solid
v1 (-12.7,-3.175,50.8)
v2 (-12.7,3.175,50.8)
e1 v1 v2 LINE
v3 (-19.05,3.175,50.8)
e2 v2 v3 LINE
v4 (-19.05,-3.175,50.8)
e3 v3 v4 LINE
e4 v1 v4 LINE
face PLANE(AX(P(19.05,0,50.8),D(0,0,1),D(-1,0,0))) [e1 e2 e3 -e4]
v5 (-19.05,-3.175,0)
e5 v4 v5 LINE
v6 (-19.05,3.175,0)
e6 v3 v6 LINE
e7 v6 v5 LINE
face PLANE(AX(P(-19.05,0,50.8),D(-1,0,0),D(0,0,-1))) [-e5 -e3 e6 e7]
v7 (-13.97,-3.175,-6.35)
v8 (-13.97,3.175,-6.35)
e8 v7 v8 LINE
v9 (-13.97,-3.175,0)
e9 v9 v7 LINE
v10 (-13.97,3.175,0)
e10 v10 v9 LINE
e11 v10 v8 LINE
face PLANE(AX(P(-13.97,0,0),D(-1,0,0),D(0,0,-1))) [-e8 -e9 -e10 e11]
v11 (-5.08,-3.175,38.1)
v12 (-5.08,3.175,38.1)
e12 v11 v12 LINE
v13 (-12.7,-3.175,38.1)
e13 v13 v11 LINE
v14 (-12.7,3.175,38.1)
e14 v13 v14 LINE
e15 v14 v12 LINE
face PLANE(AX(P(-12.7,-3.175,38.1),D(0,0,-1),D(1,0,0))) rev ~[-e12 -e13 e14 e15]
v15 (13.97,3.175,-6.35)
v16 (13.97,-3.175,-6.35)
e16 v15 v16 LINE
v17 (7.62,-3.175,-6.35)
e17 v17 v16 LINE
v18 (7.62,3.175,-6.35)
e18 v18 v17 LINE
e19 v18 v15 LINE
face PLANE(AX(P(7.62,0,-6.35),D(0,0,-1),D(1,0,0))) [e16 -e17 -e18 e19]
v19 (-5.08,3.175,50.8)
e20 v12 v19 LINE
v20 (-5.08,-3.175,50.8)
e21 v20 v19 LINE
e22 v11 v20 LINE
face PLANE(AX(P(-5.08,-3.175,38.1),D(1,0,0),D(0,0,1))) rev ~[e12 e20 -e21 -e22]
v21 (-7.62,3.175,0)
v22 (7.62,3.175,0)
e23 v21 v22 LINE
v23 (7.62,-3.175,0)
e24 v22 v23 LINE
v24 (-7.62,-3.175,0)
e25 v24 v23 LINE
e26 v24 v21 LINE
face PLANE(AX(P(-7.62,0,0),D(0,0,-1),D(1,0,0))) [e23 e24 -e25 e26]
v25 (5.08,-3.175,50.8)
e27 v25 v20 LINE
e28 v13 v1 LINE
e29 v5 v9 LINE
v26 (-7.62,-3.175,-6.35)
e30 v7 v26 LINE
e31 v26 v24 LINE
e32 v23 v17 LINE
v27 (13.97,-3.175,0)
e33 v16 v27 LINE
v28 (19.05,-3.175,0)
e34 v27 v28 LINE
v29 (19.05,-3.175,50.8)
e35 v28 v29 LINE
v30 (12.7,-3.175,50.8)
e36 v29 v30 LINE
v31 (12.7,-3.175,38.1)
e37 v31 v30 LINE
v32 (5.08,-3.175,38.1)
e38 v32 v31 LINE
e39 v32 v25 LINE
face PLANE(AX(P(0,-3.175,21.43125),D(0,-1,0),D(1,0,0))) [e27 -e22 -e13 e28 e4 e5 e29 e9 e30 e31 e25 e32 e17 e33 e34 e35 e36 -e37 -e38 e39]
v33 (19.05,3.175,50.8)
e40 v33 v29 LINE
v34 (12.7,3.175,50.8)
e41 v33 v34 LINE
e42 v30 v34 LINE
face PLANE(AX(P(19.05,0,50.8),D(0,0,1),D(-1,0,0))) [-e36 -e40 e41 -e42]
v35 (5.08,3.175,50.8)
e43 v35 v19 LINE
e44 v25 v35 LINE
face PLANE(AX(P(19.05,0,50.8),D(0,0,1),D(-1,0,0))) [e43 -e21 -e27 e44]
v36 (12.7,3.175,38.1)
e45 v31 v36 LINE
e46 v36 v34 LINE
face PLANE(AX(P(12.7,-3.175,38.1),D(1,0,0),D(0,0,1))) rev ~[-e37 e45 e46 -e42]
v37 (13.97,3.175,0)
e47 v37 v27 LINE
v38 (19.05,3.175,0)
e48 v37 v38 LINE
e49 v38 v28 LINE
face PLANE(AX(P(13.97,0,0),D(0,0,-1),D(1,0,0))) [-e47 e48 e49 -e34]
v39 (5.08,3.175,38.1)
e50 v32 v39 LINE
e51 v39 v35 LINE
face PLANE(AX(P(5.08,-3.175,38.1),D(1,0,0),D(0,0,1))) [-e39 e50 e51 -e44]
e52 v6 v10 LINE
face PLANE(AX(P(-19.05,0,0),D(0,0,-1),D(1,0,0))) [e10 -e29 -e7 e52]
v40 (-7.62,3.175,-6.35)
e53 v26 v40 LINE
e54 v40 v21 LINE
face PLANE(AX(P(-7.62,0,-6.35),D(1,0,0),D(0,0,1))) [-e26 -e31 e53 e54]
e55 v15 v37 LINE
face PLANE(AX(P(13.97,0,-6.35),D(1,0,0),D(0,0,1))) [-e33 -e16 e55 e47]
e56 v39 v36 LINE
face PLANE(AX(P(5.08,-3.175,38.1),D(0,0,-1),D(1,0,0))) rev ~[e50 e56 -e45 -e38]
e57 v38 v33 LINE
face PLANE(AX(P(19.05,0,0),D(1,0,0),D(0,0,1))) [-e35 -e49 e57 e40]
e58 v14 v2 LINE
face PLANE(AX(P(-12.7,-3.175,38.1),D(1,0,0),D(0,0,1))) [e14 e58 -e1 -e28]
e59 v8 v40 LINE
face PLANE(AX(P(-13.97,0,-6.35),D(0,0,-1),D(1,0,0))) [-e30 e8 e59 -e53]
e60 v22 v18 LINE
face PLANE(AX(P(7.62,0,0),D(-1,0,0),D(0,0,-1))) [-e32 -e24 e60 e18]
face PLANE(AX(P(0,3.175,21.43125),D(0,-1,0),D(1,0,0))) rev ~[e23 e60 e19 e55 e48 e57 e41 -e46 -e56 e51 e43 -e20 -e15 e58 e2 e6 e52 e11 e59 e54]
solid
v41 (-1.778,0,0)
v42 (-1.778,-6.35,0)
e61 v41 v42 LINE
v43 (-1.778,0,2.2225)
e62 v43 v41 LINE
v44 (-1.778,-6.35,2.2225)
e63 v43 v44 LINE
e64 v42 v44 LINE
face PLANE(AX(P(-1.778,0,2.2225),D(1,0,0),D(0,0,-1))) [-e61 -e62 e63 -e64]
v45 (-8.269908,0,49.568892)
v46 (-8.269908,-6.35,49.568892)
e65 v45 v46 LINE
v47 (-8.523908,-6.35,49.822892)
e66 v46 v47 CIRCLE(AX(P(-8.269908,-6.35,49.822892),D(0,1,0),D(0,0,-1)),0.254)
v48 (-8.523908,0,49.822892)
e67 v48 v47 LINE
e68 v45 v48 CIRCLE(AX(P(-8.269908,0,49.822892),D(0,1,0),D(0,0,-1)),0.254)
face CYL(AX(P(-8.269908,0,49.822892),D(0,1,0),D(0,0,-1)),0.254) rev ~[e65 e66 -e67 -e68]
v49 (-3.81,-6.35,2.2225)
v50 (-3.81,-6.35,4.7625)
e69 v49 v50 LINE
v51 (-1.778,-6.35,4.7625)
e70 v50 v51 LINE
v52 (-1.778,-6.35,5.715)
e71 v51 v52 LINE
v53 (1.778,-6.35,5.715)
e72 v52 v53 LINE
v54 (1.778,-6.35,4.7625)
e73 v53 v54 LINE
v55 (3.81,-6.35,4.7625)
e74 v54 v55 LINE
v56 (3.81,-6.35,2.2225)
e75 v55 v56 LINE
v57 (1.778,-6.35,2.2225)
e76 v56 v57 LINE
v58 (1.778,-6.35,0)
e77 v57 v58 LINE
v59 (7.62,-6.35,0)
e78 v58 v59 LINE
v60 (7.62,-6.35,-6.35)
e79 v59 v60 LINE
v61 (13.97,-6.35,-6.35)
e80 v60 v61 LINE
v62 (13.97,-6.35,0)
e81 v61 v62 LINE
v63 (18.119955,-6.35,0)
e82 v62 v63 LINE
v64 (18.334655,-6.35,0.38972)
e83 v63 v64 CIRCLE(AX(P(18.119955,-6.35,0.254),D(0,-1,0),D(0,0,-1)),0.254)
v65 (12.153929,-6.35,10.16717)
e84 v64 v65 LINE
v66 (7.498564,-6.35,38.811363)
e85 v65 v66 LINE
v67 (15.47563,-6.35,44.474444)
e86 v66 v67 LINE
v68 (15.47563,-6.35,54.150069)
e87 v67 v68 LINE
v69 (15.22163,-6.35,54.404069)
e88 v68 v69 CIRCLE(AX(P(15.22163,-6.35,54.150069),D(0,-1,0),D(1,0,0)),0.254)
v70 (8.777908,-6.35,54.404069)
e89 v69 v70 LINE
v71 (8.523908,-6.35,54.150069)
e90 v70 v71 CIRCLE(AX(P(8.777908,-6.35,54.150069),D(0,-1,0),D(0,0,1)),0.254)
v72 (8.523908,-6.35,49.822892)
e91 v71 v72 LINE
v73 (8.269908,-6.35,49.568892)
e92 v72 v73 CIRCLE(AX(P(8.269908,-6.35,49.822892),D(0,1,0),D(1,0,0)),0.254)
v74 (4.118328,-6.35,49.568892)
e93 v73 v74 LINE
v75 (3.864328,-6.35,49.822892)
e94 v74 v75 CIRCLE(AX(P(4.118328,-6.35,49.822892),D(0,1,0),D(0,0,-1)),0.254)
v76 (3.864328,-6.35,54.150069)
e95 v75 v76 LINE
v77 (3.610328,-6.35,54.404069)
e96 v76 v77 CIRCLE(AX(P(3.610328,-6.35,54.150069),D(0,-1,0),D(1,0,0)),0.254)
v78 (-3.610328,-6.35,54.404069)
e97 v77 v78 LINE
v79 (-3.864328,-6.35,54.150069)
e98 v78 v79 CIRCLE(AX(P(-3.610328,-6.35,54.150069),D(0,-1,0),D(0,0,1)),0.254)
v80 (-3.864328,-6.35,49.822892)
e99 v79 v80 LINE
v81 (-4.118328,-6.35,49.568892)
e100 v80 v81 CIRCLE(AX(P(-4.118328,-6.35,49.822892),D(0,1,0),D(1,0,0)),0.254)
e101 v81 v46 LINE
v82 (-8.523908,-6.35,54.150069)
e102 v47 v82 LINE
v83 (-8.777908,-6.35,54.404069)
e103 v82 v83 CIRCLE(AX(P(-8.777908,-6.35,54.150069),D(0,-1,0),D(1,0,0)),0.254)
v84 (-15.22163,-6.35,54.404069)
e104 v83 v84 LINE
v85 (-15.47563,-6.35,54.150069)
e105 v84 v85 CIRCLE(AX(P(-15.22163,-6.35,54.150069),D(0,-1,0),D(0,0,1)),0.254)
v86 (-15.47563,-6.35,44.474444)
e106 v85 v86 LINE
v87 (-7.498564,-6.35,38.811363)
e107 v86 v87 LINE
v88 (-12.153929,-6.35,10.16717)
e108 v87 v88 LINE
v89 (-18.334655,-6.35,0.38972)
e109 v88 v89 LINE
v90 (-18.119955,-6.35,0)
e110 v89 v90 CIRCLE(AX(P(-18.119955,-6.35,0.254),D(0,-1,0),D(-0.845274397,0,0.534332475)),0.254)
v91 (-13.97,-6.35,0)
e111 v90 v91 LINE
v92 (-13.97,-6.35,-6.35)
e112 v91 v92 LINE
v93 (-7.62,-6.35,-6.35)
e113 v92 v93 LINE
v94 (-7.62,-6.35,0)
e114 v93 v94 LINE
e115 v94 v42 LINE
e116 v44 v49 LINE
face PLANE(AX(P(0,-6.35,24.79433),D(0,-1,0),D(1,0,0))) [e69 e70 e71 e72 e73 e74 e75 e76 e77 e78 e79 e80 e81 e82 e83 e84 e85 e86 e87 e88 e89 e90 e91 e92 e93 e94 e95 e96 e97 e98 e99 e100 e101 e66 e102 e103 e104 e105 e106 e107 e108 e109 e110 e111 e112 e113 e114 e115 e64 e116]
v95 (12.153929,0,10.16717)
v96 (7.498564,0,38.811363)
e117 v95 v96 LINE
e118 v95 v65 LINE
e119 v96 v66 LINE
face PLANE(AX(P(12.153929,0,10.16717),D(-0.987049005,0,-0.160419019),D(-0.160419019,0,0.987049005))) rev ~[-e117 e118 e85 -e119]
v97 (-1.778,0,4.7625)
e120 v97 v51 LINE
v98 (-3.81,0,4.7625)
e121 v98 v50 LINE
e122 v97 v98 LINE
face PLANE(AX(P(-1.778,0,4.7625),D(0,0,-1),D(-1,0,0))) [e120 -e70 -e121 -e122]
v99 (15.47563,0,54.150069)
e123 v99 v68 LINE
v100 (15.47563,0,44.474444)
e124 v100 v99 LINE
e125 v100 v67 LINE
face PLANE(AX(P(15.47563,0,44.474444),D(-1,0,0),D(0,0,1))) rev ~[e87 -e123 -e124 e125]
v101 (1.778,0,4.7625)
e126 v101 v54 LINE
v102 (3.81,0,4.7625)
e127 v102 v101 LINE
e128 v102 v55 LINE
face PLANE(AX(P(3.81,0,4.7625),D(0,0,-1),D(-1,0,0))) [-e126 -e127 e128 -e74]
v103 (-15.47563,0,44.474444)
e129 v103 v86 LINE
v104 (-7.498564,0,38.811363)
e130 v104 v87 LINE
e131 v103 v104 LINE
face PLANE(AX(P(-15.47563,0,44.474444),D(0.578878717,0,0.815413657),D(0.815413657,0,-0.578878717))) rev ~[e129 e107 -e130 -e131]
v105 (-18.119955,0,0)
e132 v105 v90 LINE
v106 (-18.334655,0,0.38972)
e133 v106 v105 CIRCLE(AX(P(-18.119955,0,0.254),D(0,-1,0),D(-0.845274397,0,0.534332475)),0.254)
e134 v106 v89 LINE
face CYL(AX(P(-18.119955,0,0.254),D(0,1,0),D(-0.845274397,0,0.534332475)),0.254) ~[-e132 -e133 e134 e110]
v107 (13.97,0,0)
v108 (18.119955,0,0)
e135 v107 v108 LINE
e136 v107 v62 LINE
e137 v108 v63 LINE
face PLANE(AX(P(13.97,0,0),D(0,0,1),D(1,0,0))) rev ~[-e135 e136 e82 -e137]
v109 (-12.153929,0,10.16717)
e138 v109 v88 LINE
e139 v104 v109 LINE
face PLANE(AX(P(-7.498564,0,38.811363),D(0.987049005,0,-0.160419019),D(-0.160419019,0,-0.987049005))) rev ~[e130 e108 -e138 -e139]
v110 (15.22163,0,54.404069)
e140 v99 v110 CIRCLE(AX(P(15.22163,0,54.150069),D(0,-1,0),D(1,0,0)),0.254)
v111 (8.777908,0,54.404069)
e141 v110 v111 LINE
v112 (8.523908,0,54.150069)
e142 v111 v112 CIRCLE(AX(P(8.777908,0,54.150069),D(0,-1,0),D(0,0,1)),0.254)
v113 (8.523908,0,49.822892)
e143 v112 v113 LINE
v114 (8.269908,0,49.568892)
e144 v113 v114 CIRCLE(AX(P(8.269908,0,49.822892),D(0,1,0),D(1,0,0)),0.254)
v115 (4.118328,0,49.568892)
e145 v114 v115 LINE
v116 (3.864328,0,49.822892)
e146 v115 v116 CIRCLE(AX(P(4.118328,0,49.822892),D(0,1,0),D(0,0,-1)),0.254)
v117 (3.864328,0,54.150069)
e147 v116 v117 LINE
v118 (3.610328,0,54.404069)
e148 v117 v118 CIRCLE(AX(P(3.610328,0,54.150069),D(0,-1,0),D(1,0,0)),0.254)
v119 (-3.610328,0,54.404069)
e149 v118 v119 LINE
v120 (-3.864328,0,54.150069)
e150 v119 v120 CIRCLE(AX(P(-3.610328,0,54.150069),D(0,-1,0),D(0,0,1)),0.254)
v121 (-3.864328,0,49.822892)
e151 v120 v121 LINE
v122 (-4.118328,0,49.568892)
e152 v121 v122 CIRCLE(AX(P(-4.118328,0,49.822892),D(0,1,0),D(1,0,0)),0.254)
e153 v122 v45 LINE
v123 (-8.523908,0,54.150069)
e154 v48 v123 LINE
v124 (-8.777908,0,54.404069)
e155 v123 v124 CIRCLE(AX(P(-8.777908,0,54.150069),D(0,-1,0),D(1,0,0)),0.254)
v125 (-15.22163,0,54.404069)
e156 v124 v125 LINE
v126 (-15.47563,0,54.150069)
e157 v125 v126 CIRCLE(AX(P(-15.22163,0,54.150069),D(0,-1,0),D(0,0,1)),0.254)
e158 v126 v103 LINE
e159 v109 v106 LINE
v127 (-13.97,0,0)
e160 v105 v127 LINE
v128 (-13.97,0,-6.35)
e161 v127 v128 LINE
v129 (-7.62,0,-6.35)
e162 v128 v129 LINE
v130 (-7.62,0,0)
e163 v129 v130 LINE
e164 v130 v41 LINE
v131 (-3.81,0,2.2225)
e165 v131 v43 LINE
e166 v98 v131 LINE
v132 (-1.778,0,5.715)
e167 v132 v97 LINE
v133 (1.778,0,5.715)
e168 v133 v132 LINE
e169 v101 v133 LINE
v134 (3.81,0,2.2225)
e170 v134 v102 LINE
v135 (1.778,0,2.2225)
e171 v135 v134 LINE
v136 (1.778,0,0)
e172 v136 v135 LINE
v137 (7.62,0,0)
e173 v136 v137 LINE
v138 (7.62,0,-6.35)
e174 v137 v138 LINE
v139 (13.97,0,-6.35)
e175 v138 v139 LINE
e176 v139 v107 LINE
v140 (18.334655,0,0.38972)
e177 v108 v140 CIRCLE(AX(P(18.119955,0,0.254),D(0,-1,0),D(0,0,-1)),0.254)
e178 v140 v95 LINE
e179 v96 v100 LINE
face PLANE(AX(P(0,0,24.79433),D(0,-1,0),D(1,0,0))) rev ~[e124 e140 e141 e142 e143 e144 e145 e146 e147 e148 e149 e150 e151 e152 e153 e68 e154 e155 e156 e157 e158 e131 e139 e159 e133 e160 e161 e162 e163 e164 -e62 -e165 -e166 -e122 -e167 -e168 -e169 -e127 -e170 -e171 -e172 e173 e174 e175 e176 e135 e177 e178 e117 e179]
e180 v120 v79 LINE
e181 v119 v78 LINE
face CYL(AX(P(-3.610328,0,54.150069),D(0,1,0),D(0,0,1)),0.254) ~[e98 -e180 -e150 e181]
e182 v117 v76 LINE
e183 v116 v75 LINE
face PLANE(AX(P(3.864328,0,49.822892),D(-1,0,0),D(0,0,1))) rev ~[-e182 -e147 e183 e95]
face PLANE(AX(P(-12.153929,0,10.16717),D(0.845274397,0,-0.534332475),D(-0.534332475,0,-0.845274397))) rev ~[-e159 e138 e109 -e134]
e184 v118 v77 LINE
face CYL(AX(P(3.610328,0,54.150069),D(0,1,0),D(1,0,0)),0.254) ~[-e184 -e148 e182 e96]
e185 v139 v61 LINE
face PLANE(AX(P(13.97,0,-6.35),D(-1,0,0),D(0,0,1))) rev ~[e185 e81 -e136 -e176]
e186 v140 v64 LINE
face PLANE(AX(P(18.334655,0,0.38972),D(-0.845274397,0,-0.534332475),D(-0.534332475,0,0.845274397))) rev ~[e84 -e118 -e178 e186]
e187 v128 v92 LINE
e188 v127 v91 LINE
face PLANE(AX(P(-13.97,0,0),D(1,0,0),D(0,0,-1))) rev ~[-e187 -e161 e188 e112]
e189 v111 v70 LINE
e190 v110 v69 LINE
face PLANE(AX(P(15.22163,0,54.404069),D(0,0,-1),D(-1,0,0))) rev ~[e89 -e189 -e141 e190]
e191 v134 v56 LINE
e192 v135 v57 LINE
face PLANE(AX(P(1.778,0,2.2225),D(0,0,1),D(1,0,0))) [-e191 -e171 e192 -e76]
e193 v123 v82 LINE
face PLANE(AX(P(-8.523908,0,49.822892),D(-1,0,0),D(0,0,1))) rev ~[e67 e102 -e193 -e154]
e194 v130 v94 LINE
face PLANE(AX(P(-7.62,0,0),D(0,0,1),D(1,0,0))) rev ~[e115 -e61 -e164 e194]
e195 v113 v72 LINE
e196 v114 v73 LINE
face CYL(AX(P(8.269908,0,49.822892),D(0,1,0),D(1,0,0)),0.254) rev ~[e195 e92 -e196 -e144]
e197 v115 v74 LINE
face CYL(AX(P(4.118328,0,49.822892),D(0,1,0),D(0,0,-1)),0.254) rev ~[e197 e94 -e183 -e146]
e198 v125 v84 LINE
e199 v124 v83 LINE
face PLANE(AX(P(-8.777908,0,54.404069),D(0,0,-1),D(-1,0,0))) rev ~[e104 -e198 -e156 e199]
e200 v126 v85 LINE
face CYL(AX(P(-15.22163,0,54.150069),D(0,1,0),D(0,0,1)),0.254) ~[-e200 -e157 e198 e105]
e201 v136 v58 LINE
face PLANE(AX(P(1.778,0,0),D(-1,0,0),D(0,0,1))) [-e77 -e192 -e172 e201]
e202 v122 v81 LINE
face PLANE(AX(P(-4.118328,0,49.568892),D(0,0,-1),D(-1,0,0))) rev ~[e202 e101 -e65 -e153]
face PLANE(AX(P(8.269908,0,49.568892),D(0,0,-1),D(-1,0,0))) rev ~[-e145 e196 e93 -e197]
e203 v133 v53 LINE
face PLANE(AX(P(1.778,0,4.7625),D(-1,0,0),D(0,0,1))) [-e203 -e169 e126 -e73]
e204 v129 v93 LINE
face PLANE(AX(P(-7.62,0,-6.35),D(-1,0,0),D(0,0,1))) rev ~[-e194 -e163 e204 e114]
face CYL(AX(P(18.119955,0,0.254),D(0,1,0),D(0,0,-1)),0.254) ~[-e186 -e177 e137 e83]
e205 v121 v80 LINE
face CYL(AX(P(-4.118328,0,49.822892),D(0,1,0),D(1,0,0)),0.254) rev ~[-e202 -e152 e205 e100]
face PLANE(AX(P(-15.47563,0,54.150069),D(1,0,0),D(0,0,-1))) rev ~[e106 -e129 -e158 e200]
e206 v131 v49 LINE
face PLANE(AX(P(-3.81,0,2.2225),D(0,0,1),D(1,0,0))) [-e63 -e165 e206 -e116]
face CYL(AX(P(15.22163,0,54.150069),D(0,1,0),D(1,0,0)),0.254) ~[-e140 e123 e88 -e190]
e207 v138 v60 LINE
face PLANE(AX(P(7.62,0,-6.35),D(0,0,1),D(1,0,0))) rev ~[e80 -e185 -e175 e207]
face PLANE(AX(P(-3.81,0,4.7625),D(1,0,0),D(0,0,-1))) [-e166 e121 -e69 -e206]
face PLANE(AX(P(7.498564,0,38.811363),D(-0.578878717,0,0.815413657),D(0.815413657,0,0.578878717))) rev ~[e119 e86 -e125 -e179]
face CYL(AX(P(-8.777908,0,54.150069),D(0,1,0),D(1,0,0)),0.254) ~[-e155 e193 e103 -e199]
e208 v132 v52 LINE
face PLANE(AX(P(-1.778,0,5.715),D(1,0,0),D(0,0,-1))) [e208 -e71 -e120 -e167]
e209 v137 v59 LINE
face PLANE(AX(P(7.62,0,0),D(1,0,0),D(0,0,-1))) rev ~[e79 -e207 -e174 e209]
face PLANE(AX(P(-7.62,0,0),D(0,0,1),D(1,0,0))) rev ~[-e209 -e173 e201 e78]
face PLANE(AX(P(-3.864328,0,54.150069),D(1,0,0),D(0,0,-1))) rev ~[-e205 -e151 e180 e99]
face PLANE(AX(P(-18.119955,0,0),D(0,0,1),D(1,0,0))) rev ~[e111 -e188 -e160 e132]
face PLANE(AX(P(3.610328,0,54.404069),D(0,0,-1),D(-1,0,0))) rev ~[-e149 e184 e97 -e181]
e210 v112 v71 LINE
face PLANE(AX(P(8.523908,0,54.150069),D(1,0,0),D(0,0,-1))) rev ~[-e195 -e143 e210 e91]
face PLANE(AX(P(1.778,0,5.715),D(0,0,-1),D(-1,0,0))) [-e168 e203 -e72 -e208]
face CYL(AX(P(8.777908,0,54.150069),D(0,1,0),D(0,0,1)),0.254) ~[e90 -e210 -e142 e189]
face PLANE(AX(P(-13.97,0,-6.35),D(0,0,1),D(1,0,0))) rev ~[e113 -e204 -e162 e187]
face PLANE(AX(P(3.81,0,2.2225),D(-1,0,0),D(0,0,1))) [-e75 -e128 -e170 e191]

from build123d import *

# Parameters (mm, degrees)
F1_DEPTH      = 3.175
F1_DEPTH_BACK = 3.175
F2_W          = 7.62
F2_H          = 12.7
F3_DEPTH      = 25.4
F5_DEPTH      = 6.35
F7_DEPTH      = 25.4


with BuildPart() as f1:
    # F0 (on Front) → F1 (new body, two sides)
    with BuildSketch(Plane.XZ) as f1_sk:
        Polygon((-7.62, 0), (-6.35, 0), (6.35, 0), (7.62, 0), (7.62, -6.35), (13.97, -6.35), (13.97, 0), (19.05, 0), (19.05, 50.8), (-19.05, 50.8), (-19.05, 0), (-13.97, 0), (-13.97, -6.35), (-7.62, -6.35), align=None)
    extrude(amount=F1_DEPTH)
    extrude(f1_sk.sketch, amount=-F1_DEPTH_BACK)

    # F2 (on face) → F3 (cut)
    with BuildSketch(Plane.XZ.offset(3.175)):
        with Locations((-8.89, 44.45)):
            Rectangle(F2_W, F2_H)
        with Locations((8.89, 44.45)):
            Rectangle(F2_W, F2_H)
    extrude(amount=-F3_DEPTH, mode=Mode.SUBTRACT)


with BuildPart() as f5:
    # F4 (on Front) → F5 (new body)
    with BuildSketch(Plane.XZ):
        with BuildLine():
            ThreePointArc((-18.3346545666, 0.3897204487), (-18.342428457, 0.1314377586), (-18.1199548699, 0))
            Line((-18.1199548699, 0), (-13.97, 0))
            Line((-13.97, 0), (-13.97, -6.35))
            Line((-13.97, -6.35), (-7.62, -6.35))
            Line((-7.62, -6.35), (-7.62, 0))
            Line((-7.62, 0), (7.62, 0))
            Line((7.62, 0), (7.62, -6.35))
            Line((7.62, -6.35), (13.97, -6.35))
            Line((13.97, -6.35), (13.97, 0))
            Line((13.97, 0), (18.1199548699, 0))
            ThreePointArc((18.1199548699, 0), (18.342428457, 0.1314377586), (18.3346545666, 0.3897204487))
            Line((18.3346545666, 0.3897204487), (12.1539290994, 10.167170316))
            Line((12.1539290994, 10.167170316), (7.4985641986, 38.8113629378))
            Line((7.4985641986, 38.8113629378), (15.4756298289, 44.474443851))
            Line((15.4756298289, 44.474443851), (15.4756298289, 54.1500687382))
            ThreePointArc((15.4756298289, 54.1500687382), (15.4012349513, 54.3296738606), (15.2216298289, 54.4040687382))
            Line((15.2216298289, 54.4040687382), (8.7779075124, 54.4040687382))
            ThreePointArc((8.7779075124, 54.4040687382), (8.59830239, 54.3296738606), (8.5239075124, 54.1500687382))
            Line((8.5239075124, 54.1500687382), (8.5239075124, 49.8228915253))
            ThreePointArc((8.5239075124, 49.8228915253), (8.4495126348, 49.6432864028), (8.2699075124, 49.5688915253))
            Line((8.2699075124, 49.5688915253), (4.1183283769, 49.5688915253))
            ThreePointArc((4.1183283769, 49.5688915253), (3.9387232545, 49.6432864028), (3.8643283769, 49.8228915253))
            Line((3.8643283769, 49.8228915253), (3.8643283769, 54.1500687382))
            ThreePointArc((3.8643283769, 54.1500687382), (3.7899334994, 54.3296738606), (3.6103283769, 54.4040687382))
            Line((3.6103283769, 54.4040687382), (0, 54.4040687382))
            Line((0, 54.4040687382), (-3.6103283769, 54.4040687382))
            ThreePointArc((-3.6103283769, 54.4040687382), (-3.7899334994, 54.3296738606), (-3.8643283769, 54.1500687382))
            Line((-3.8643283769, 54.1500687382), (-3.8643283769, 49.8228915253))
            ThreePointArc((-3.8643283769, 49.8228915253), (-3.9387232545, 49.6432864028), (-4.1183283769, 49.5688915253))
            Line((-4.1183283769, 49.5688915253), (-8.2699075124, 49.5688915253))
            ThreePointArc((-8.2699075124, 49.5688915253), (-8.4495126348, 49.6432864028), (-8.5239075124, 49.8228915253))
            Line((-8.5239075124, 49.8228915253), (-8.5239075124, 54.1500687382))
            ThreePointArc((-8.5239075124, 54.1500687382), (-8.59830239, 54.3296738606), (-8.7779075124, 54.4040687382))
            Line((-8.7779075124, 54.4040687382), (-15.2216298289, 54.4040687382))
            ThreePointArc((-15.2216298289, 54.4040687382), (-15.4012349513, 54.3296738606), (-15.4756298289, 54.1500687382))
            Line((-15.4756298289, 54.1500687382), (-15.4756298289, 44.474443851))
            Line((-15.4756298289, 44.474443851), (-7.4985641986, 38.8113629378))
            Line((-7.4985641986, 38.8113629378), (-12.1539290994, 10.167170316))
            Line((-12.1539290994, 10.167170316), (-18.3346545666, 0.3897204487))
        make_face()
    extrude(amount=F5_DEPTH)

    # F6 (on Front) → F7 (cut)
    with BuildSketch(Plane.XZ):
        Polygon((1.778, 5.715), (-1.778, 5.715), (-1.778, 4.7625), (-3.81, 4.7625), (-3.81, 2.2225), (-1.778, 2.2225), (-1.778, 0), (1.778, 0), (1.778, 2.2225), (3.81, 2.2225), (3.81, 4.7625), (1.778, 4.7625), align=None)
    extrude(amount=F7_DEPTH, mode=Mode.SUBTRACT)


solid = Compound([f1.part, f5.part])
